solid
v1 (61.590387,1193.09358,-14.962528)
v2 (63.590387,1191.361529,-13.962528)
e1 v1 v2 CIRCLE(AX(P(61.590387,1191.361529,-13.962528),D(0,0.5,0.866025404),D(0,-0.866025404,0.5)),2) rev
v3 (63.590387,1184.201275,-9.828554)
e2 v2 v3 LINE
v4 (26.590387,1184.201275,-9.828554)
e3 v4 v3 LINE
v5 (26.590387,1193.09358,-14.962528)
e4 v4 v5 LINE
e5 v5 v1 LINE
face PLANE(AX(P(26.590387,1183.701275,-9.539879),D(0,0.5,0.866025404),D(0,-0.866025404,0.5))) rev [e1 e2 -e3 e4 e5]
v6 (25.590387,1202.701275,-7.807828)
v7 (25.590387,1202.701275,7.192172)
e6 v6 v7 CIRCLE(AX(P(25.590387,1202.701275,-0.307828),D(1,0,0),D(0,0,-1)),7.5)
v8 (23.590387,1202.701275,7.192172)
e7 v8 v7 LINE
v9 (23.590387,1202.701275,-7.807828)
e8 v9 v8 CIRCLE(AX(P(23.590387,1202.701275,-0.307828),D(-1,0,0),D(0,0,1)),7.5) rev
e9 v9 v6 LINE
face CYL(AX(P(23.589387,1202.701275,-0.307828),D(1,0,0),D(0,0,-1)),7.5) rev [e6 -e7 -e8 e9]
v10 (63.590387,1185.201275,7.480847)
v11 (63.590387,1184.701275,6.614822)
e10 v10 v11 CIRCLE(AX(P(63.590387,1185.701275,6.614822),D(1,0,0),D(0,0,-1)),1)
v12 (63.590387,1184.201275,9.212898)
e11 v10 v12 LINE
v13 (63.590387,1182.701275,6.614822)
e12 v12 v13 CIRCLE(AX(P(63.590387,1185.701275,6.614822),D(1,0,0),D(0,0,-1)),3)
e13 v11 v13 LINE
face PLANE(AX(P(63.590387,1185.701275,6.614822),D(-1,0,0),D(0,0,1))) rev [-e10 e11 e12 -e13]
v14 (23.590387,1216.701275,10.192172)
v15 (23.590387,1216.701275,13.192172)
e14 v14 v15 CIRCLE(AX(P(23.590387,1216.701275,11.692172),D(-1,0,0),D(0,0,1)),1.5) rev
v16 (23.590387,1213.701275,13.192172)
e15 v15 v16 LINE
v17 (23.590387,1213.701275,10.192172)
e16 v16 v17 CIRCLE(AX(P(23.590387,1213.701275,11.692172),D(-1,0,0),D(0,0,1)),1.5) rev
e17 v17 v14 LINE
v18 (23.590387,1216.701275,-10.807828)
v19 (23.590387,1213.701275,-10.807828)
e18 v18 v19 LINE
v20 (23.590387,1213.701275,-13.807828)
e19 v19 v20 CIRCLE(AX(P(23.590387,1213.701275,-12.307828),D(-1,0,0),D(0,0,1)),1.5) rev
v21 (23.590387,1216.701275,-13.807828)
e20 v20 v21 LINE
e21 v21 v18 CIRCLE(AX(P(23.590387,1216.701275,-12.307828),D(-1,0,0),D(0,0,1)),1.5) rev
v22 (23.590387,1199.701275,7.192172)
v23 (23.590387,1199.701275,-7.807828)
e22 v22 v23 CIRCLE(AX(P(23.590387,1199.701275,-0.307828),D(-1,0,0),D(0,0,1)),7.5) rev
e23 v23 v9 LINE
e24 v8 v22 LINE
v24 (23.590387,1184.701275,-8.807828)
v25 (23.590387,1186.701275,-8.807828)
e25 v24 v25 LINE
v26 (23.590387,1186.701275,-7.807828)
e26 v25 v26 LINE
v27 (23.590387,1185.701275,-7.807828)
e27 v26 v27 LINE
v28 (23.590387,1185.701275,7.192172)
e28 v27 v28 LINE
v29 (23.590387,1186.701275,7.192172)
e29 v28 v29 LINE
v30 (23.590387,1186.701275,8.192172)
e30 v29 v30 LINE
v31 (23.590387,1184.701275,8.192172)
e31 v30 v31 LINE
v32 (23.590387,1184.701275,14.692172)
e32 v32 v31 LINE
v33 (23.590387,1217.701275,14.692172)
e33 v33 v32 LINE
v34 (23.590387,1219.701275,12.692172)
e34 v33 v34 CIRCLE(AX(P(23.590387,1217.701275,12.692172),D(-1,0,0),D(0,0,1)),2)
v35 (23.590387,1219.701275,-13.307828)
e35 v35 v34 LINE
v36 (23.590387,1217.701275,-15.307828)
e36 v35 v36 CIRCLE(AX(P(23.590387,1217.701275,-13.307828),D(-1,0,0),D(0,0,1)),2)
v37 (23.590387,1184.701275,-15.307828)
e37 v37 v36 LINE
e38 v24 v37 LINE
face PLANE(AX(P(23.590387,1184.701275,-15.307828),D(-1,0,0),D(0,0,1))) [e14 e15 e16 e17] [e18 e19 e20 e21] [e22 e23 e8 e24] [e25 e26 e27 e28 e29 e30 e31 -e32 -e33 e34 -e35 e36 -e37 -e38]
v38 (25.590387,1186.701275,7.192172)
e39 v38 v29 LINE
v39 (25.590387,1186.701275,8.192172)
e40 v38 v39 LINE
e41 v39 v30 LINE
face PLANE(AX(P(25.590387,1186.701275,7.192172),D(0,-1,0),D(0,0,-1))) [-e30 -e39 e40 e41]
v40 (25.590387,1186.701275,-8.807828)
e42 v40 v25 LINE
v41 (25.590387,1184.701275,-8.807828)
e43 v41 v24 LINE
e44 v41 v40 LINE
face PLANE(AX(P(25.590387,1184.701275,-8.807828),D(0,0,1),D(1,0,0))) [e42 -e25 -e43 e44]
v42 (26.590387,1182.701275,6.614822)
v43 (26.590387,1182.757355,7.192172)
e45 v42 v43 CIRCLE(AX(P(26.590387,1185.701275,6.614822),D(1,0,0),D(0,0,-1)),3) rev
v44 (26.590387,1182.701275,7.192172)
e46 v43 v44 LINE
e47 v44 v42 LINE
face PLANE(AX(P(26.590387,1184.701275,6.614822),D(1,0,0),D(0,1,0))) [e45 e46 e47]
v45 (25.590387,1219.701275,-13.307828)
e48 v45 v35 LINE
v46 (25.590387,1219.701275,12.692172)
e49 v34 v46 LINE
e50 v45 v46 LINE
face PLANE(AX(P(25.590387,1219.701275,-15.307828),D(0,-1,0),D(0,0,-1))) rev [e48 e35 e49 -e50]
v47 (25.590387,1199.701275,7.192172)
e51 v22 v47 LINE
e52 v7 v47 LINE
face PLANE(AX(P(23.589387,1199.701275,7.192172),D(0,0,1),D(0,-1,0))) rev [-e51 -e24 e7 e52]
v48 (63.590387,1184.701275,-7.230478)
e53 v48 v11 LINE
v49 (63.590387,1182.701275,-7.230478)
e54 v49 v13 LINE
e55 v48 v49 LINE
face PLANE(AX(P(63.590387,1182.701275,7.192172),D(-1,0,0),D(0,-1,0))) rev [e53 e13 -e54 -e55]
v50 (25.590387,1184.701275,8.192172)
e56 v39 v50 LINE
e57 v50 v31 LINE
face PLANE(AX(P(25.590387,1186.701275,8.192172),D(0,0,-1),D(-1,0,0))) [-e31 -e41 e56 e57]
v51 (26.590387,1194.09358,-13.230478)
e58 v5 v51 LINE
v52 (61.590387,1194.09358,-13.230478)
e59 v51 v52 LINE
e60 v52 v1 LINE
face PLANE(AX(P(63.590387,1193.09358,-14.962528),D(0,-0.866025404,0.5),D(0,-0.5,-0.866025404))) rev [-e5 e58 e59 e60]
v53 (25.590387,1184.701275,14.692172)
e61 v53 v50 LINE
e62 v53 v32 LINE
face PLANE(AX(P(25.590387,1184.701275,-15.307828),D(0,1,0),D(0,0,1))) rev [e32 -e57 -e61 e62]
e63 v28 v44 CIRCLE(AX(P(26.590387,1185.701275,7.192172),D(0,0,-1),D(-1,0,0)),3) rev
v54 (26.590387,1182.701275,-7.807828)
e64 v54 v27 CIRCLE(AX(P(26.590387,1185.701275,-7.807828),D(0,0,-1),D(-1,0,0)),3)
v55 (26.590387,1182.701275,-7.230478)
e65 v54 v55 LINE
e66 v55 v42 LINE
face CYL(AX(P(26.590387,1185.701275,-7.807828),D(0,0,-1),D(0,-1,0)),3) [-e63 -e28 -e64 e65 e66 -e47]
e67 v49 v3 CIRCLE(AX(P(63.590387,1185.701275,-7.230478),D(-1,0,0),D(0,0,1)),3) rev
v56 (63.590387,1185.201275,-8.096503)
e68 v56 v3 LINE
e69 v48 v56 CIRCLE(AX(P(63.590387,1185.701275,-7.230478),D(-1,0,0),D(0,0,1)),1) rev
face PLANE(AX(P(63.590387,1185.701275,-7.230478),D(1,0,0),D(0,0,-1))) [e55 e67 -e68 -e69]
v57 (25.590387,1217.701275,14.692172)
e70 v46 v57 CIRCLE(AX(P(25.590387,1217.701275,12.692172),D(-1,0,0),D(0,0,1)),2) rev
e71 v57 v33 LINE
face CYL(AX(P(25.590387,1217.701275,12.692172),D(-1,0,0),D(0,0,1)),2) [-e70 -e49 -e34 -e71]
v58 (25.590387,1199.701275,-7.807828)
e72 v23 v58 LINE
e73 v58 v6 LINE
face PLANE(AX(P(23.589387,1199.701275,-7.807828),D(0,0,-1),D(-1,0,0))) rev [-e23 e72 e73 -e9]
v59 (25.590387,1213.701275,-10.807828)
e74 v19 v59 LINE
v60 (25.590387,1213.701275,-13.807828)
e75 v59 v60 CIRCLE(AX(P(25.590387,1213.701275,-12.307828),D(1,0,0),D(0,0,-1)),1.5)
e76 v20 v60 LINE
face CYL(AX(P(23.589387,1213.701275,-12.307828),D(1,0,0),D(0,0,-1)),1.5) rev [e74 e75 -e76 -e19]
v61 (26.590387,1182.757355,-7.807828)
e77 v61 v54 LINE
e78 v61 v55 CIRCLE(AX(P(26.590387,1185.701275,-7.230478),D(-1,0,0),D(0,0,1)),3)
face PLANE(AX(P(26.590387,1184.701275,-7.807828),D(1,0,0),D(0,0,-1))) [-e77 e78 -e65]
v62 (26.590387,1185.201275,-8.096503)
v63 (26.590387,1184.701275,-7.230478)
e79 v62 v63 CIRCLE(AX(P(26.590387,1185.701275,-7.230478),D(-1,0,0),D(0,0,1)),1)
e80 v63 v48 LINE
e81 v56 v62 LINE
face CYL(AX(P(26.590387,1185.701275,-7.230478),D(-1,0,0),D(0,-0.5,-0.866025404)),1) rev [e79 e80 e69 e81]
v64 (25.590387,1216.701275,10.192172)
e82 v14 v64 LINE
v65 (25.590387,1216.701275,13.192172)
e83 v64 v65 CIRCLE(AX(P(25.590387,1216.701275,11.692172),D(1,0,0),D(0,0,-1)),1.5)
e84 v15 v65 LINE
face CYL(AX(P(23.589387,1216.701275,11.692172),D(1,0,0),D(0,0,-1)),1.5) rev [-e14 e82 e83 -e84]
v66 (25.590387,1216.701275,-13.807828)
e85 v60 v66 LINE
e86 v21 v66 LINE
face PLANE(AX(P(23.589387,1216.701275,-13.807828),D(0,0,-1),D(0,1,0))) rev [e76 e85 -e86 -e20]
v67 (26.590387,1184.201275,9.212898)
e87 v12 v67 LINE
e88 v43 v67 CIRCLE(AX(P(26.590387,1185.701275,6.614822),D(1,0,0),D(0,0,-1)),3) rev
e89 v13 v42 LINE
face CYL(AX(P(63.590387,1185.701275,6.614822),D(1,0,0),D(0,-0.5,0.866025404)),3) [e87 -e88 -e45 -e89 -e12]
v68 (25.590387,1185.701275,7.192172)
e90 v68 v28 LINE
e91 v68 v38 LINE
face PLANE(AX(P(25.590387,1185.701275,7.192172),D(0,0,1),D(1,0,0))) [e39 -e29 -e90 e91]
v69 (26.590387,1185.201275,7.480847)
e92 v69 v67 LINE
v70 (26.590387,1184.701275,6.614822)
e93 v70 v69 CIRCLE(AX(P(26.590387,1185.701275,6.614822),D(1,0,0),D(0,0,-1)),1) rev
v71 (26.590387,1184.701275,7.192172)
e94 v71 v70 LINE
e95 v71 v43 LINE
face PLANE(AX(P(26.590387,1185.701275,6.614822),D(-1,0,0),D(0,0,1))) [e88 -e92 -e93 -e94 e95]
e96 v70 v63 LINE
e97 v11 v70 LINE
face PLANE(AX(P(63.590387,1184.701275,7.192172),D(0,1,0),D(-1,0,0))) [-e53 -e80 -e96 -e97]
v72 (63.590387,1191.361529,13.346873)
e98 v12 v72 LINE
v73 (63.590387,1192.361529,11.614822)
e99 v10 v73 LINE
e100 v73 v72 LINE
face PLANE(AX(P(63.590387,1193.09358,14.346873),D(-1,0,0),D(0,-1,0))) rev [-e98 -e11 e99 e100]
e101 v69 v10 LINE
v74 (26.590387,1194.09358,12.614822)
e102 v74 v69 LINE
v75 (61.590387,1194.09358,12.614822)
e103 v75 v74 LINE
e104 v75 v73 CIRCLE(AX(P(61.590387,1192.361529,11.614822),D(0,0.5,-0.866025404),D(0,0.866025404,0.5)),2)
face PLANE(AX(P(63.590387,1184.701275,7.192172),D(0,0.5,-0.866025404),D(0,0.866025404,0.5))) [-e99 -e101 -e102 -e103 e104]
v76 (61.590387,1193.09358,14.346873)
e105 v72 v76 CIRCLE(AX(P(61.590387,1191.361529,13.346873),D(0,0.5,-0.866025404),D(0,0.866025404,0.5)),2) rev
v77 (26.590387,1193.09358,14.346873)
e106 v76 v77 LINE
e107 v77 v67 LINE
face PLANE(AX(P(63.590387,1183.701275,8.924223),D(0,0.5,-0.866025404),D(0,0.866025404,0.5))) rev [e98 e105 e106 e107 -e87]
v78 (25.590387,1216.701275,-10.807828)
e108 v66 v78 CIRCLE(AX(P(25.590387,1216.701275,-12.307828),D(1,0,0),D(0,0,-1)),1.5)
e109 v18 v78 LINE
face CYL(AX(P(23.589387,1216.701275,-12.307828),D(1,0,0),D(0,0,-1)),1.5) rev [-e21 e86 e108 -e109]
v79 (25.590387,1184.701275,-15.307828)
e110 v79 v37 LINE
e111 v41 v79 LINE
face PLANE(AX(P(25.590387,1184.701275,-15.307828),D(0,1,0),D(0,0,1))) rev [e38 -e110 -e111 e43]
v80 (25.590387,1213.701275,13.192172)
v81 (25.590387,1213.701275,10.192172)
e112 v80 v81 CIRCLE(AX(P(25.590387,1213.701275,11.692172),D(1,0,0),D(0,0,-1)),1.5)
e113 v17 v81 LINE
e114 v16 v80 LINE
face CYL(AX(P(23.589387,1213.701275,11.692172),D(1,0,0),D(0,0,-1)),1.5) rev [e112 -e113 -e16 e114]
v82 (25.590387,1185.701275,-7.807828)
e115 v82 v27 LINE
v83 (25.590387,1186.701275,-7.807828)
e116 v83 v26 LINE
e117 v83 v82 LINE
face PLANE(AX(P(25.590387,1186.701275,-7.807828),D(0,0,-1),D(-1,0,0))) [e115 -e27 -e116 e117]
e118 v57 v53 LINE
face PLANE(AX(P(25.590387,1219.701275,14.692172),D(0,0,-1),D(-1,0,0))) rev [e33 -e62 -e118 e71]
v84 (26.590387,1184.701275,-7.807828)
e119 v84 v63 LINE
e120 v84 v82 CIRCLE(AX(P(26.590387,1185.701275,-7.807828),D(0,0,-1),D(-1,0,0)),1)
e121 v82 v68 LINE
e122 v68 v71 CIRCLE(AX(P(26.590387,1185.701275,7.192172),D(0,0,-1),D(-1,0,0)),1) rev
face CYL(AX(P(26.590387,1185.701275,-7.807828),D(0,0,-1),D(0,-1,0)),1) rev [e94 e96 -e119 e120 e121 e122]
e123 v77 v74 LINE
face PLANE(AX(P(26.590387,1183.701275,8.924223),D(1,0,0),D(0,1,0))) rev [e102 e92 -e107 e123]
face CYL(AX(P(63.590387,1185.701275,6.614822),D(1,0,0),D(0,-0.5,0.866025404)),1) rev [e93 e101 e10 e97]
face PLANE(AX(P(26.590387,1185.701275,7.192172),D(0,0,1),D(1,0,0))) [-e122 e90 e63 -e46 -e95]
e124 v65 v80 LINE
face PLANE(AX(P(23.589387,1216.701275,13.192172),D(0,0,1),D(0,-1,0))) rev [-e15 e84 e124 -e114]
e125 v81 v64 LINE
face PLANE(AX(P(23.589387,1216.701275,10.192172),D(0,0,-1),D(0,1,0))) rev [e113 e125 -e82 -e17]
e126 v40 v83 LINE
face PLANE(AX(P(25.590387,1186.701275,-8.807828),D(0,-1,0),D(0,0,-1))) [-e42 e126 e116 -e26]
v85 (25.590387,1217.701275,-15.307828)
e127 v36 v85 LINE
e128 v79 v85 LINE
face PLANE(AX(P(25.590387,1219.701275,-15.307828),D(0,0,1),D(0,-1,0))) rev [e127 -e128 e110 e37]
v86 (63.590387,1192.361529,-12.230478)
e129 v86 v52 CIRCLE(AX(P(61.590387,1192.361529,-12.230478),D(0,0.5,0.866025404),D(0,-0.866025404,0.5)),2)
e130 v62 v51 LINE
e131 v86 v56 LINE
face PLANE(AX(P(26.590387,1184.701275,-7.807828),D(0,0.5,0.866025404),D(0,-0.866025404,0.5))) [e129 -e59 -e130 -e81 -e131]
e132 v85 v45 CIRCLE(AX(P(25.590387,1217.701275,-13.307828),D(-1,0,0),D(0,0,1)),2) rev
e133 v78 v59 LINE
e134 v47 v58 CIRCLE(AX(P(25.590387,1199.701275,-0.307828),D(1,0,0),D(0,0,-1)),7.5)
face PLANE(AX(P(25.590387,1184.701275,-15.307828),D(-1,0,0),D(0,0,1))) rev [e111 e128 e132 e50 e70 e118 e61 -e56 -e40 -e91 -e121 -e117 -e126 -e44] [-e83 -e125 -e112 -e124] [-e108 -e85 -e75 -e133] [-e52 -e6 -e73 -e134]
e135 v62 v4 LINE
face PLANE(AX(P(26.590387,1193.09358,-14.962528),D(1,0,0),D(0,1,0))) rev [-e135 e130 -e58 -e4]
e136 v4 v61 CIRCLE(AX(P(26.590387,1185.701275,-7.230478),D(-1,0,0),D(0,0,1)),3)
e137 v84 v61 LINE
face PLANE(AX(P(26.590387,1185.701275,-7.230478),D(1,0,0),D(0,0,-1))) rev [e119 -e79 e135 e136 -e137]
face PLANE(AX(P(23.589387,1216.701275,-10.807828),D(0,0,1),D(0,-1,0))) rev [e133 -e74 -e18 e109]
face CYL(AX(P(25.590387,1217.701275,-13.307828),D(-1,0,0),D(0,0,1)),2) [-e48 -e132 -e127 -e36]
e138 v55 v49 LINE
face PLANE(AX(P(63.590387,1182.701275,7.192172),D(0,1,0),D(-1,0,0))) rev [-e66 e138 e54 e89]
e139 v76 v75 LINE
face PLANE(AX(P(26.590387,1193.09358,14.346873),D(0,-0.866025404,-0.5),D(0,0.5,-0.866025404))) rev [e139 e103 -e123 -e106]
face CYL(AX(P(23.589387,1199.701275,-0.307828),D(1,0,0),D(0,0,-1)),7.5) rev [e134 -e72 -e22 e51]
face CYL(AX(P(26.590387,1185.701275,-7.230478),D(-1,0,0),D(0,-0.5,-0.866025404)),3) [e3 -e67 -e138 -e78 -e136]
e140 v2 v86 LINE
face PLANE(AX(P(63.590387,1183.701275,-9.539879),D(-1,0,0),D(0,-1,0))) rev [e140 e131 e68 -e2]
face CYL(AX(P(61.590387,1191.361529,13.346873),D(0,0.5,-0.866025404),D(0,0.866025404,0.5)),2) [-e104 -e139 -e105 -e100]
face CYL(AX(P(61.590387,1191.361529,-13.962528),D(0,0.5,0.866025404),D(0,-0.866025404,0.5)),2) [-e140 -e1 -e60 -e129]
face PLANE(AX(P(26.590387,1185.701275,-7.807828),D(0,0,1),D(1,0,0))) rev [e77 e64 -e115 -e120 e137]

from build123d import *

# Parameters (mm, degrees)
SKETCH1_W                      = 30
SKETCH1_H                      = 35
BASE_FLANGE1_DEPTH             = 2
EDGE_FLANGE1_STRIP_W           = 10
EDGE_FLANGE1_STRIP_H           = 2
EDGE_FLANGE1_STRIP_CUT_DEPTH   = 15
EDGE_FLANGE1_RELIEF_W          = 11
EDGE_FLANGE1_RELIEF_H          = 1
EDGE_FLANGE1_RELIEF_CUT_DEPTH  = 2
EDGE_FLANGE1_DEPTH             = 15
CUT_EXTRUDE1_REACH             = 1222.389
CUT_EXTRUDE2_REACH             = 1222.389
EDGE_FLANGE3_STRIP_CUT_DEPTH   = 37
EDGE_FLANGE3_STRIP_CUT_2_DEPTH = 37
EDGE_FLANGE3_DEPTH             = 37
EDGE_FLANGE3_BEND_DEPTH        = 37
FILLET5_R                      = 2


# Sheet-metal steps are written as plain solids
with BuildPart() as part:
    # Sketch1 → Base-Flange1 (new body)
    with BuildSketch(Plane(origin=(23.590386714, 0, 0), x_dir=(0, 0, -1), z_dir=(1, 0, 0))):
        with Locations((0.307827961, 1202.201275355)):
            Rectangle(SKETCH1_W, SKETCH1_H)
    extrude(amount=BASE_FLANGE1_DEPTH)

    # Edge-Flange1 strip (across the edge) → Edge-Flange1 strip cut (cut)
    with BuildSketch(Plane(origin=(25.590386714, 1184.701275355, 7.192172039), x_dir=(0, 1, 0), z_dir=(0, 0, -1))):
        with Locations((-4, -1)):
            Rectangle(EDGE_FLANGE1_STRIP_W, EDGE_FLANGE1_STRIP_H)
    extrude(amount=EDGE_FLANGE1_STRIP_CUT_DEPTH, mode=Mode.SUBTRACT)

    # Edge-Flange1 relief (on the sheet) → Edge-Flange1 relief cut (cut)
    with BuildSketch(Plane(origin=(25.590386714, 1185.701275355, 7.192172039), x_dir=(0, 1, 0), z_dir=(1, 0, 0))):
        with Locations((-4.5, 0.5)):
            Rectangle(EDGE_FLANGE1_RELIEF_W, EDGE_FLANGE1_RELIEF_H)
        with Locations((-4.5, -15.5)):
            Rectangle(EDGE_FLANGE1_RELIEF_W, EDGE_FLANGE1_RELIEF_H)
    extrude(amount=-EDGE_FLANGE1_RELIEF_CUT_DEPTH, mode=Mode.SUBTRACT)

    # Edge-Flange1 section (across the edge) → Edge-Flange1 (add)
    with BuildSketch(Plane(origin=(25.590386714, 1184.701275355, 7.192172039), x_dir=(0, 1, 0), z_dir=(0, 0, -1))):
        with BuildLine():
            Line((-2, 1), (-2, 38))
            Line((-2, 38), (0, 38))
            Line((0, 38), (0, 1))
            ThreePointArc((0, 1), (0.292893219, 0.292893219), (1, 0))
            Line((1, 0), (1, -2))
            ThreePointArc((1, -2), (-1.121320344, -1.121320344), (-2, 1))
        make_face()
    extrude(amount=EDGE_FLANGE1_DEPTH)

    # Sketch7 → Cut-Extrude1 (cut, up to next)
    with BuildSketch(Plane(origin=(25.590386714, 0, 0), x_dir=(0, 0, -1), z_dir=(1, 0, 0)), mode=Mode.PRIVATE) as cut_extrude1_sk1:
        with BuildLine():
            Line((-10.192172039, 1216.701275355), (-10.192172039, 1213.701275355))
            ThreePointArc((-10.192172039, 1213.701275355), (-11.692172039, 1212.201275355), (-13.192172039, 1213.701275355))
            Line((-13.192172039, 1213.701275355), (-13.192172039, 1216.701275355))
            ThreePointArc((-13.192172039, 1216.701275355), (-11.692172039, 1218.201275355), (-10.192172039, 1216.701275355))
        make_face()
    cut_extrude1_tool1 = extrude(cut_extrude1_sk1.sketch, amount=-CUT_EXTRUDE1_REACH, mode=Mode.PRIVATE) & part.part
    # Sketch7 → Cut-Extrude1 (cut, up to next)
    with BuildSketch(Plane(origin=(25.590386714, 0, 0), x_dir=(0, 0, -1), z_dir=(1, 0, 0)), mode=Mode.PRIVATE) as cut_extrude1_sk2:
        with BuildLine():
            Line((10.807827961, 1216.701275355), (10.807827961, 1213.701275355))
            ThreePointArc((10.807827961, 1213.701275355), (12.307827961, 1212.201275355), (13.807827961, 1213.701275355))
            Line((13.807827961, 1213.701275355), (13.807827961, 1216.701275355))
            ThreePointArc((13.807827961, 1216.701275355), (12.307827961, 1218.201275355), (10.807827961, 1216.701275355))
        make_face()
    cut_extrude1_tool2 = extrude(cut_extrude1_sk2.sketch, amount=-CUT_EXTRUDE1_REACH, mode=Mode.PRIVATE) & part.part
    add(cut_extrude1_tool1.solids().sort_by_distance((25.590387, 1215.201275, 11.692172))[0], mode=Mode.SUBTRACT)
    add(cut_extrude1_tool2.solids().sort_by_distance((25.590387, 1215.201275, -12.307828))[0], mode=Mode.SUBTRACT)

    # Sketch8 → Cut-Extrude2 (cut, up to next)
    with BuildSketch(Plane(origin=(25.590386714, 0, 0), x_dir=(0, 0, -1), z_dir=(1, 0, 0)), mode=Mode.PRIVATE) as cut_extrude2_sk1:
        with BuildLine():
            Line((-7.192172039, 1199.701275355), (-7.192172039, 1202.701275355))
            ThreePointArc((-7.192172039, 1202.701275355), (0.307827961, 1210.201275355), (7.807827961, 1202.701275355))
            Line((7.807827961, 1202.701275355), (7.807827961, 1199.701275355))
            ThreePointArc((7.807827961, 1199.701275355), (0.307827961, 1192.201275355), (-7.192172039, 1199.701275355))
        make_face()
    cut_extrude2_tool1 = extrude(cut_extrude2_sk1.sketch, amount=-CUT_EXTRUDE2_REACH, mode=Mode.PRIVATE) & part.part
    add(cut_extrude2_tool1.solids().sort_by_distance((25.590387, 1201.201275, -0.307828))[0], mode=Mode.SUBTRACT)

    # Edge-Flange3 strip (across the edge) → Edge-Flange3 strip cut (cut)
    with BuildSketch(Plane(origin=(26.590386714, 1184.701275355, 7.192172039), x_dir=(3.000602769257188e-15, 0.5000000000000041, -0.8660254037844364), z_dir=(1, 0, 0))):
        Polygon((-9.160254038, 2.979274058), (-0.5, -2.020725942), (0.5, -0.288675135), (-8.160254038, 4.711324865), align=None)
    extrude(amount=EDGE_FLANGE3_STRIP_CUT_DEPTH, mode=Mode.SUBTRACT)

    # Edge-Flange3 strip 2 (across the edge) → Edge-Flange3 strip cut 2 (cut)
    with BuildSketch(Plane(origin=(63.590386714, 1184.701275355, -7.807827961), x_dir=(2.9396981233624387e-15, 0.5000000000000041, 0.8660254037844364), z_dir=(-1, 0, 0))):
        Polygon((-9.160254038, 2.979274058), (-0.5, -2.020725942), (0.5, -0.288675135), (-8.160254038, 4.711324865), align=None)
    extrude(amount=EDGE_FLANGE3_STRIP_CUT_2_DEPTH, mode=Mode.SUBTRACT)

    # Edge-Flange3 section (across the edge) → Edge-Flange3 (add)
    with BuildSketch(Plane(origin=(26.590386714, 1184.701275355, 7.192172039), x_dir=(3.000602769257188e-15, 0.5000000000000041, -0.8660254037844364), z_dir=(1, 0, 0))):
        with BuildLine():
            Line((-2, 0.577350269), (-2, 10.845299462))
            Line((-2, 10.845299462), (0, 10.845299462))
            Line((0, 10.845299462), (0, 0.577350269))
            ThreePointArc((0, 0.577350269), (0.133974596, 0.077350269), (0.5, -0.288675135))
            Line((0.5, -0.288675135), (-0.5, -2.020725942))
            ThreePointArc((-0.5, -2.020725942), (-1.598076211, -0.922649731), (-2, 0.577350269))
        make_face()
    extrude(amount=EDGE_FLANGE3_DEPTH)

    # Edge-Flange3 section 2 (across the edge) → Edge-Flange3 bend (add)
    with BuildSketch(Plane(origin=(63.590386714, 1184.701275355, -7.807827961), x_dir=(2.9396981233624387e-15, 0.5000000000000041, 0.8660254037844364), z_dir=(-1, 0, 0))):
        with BuildLine():
            Line((-2, 0.577350269), (-2, 10.845299462))
            Line((-2, 10.845299462), (0, 10.845299462))
            Line((0, 10.845299462), (0, 0.577350269))
            ThreePointArc((0, 0.577350269), (0.133974596, 0.077350269), (0.5, -0.288675135))
            Line((0.5, -0.288675135), (-0.5, -2.020725942))
            ThreePointArc((-0.5, -2.020725942), (-1.598076211, -0.922649731), (-2, 0.577350269))
        make_face()
    extrude(amount=EDGE_FLANGE3_BEND_DEPTH)

    # Fillet5
    fillet5_edges = [part.edges().sort_by_distance(p)[0] for p in [
        (63.590386714, 1193.5935802, 13.480847173),
        (63.590386714, 1193.5935802, -14.096503096),
        (24.590386714, 1219.701275355, 14.692172039),
        (24.590386714, 1219.701275355, -15.307827961),
    ]]
    fillet(fillet5_edges, radius=FILLET5_R)


solid = part.part
